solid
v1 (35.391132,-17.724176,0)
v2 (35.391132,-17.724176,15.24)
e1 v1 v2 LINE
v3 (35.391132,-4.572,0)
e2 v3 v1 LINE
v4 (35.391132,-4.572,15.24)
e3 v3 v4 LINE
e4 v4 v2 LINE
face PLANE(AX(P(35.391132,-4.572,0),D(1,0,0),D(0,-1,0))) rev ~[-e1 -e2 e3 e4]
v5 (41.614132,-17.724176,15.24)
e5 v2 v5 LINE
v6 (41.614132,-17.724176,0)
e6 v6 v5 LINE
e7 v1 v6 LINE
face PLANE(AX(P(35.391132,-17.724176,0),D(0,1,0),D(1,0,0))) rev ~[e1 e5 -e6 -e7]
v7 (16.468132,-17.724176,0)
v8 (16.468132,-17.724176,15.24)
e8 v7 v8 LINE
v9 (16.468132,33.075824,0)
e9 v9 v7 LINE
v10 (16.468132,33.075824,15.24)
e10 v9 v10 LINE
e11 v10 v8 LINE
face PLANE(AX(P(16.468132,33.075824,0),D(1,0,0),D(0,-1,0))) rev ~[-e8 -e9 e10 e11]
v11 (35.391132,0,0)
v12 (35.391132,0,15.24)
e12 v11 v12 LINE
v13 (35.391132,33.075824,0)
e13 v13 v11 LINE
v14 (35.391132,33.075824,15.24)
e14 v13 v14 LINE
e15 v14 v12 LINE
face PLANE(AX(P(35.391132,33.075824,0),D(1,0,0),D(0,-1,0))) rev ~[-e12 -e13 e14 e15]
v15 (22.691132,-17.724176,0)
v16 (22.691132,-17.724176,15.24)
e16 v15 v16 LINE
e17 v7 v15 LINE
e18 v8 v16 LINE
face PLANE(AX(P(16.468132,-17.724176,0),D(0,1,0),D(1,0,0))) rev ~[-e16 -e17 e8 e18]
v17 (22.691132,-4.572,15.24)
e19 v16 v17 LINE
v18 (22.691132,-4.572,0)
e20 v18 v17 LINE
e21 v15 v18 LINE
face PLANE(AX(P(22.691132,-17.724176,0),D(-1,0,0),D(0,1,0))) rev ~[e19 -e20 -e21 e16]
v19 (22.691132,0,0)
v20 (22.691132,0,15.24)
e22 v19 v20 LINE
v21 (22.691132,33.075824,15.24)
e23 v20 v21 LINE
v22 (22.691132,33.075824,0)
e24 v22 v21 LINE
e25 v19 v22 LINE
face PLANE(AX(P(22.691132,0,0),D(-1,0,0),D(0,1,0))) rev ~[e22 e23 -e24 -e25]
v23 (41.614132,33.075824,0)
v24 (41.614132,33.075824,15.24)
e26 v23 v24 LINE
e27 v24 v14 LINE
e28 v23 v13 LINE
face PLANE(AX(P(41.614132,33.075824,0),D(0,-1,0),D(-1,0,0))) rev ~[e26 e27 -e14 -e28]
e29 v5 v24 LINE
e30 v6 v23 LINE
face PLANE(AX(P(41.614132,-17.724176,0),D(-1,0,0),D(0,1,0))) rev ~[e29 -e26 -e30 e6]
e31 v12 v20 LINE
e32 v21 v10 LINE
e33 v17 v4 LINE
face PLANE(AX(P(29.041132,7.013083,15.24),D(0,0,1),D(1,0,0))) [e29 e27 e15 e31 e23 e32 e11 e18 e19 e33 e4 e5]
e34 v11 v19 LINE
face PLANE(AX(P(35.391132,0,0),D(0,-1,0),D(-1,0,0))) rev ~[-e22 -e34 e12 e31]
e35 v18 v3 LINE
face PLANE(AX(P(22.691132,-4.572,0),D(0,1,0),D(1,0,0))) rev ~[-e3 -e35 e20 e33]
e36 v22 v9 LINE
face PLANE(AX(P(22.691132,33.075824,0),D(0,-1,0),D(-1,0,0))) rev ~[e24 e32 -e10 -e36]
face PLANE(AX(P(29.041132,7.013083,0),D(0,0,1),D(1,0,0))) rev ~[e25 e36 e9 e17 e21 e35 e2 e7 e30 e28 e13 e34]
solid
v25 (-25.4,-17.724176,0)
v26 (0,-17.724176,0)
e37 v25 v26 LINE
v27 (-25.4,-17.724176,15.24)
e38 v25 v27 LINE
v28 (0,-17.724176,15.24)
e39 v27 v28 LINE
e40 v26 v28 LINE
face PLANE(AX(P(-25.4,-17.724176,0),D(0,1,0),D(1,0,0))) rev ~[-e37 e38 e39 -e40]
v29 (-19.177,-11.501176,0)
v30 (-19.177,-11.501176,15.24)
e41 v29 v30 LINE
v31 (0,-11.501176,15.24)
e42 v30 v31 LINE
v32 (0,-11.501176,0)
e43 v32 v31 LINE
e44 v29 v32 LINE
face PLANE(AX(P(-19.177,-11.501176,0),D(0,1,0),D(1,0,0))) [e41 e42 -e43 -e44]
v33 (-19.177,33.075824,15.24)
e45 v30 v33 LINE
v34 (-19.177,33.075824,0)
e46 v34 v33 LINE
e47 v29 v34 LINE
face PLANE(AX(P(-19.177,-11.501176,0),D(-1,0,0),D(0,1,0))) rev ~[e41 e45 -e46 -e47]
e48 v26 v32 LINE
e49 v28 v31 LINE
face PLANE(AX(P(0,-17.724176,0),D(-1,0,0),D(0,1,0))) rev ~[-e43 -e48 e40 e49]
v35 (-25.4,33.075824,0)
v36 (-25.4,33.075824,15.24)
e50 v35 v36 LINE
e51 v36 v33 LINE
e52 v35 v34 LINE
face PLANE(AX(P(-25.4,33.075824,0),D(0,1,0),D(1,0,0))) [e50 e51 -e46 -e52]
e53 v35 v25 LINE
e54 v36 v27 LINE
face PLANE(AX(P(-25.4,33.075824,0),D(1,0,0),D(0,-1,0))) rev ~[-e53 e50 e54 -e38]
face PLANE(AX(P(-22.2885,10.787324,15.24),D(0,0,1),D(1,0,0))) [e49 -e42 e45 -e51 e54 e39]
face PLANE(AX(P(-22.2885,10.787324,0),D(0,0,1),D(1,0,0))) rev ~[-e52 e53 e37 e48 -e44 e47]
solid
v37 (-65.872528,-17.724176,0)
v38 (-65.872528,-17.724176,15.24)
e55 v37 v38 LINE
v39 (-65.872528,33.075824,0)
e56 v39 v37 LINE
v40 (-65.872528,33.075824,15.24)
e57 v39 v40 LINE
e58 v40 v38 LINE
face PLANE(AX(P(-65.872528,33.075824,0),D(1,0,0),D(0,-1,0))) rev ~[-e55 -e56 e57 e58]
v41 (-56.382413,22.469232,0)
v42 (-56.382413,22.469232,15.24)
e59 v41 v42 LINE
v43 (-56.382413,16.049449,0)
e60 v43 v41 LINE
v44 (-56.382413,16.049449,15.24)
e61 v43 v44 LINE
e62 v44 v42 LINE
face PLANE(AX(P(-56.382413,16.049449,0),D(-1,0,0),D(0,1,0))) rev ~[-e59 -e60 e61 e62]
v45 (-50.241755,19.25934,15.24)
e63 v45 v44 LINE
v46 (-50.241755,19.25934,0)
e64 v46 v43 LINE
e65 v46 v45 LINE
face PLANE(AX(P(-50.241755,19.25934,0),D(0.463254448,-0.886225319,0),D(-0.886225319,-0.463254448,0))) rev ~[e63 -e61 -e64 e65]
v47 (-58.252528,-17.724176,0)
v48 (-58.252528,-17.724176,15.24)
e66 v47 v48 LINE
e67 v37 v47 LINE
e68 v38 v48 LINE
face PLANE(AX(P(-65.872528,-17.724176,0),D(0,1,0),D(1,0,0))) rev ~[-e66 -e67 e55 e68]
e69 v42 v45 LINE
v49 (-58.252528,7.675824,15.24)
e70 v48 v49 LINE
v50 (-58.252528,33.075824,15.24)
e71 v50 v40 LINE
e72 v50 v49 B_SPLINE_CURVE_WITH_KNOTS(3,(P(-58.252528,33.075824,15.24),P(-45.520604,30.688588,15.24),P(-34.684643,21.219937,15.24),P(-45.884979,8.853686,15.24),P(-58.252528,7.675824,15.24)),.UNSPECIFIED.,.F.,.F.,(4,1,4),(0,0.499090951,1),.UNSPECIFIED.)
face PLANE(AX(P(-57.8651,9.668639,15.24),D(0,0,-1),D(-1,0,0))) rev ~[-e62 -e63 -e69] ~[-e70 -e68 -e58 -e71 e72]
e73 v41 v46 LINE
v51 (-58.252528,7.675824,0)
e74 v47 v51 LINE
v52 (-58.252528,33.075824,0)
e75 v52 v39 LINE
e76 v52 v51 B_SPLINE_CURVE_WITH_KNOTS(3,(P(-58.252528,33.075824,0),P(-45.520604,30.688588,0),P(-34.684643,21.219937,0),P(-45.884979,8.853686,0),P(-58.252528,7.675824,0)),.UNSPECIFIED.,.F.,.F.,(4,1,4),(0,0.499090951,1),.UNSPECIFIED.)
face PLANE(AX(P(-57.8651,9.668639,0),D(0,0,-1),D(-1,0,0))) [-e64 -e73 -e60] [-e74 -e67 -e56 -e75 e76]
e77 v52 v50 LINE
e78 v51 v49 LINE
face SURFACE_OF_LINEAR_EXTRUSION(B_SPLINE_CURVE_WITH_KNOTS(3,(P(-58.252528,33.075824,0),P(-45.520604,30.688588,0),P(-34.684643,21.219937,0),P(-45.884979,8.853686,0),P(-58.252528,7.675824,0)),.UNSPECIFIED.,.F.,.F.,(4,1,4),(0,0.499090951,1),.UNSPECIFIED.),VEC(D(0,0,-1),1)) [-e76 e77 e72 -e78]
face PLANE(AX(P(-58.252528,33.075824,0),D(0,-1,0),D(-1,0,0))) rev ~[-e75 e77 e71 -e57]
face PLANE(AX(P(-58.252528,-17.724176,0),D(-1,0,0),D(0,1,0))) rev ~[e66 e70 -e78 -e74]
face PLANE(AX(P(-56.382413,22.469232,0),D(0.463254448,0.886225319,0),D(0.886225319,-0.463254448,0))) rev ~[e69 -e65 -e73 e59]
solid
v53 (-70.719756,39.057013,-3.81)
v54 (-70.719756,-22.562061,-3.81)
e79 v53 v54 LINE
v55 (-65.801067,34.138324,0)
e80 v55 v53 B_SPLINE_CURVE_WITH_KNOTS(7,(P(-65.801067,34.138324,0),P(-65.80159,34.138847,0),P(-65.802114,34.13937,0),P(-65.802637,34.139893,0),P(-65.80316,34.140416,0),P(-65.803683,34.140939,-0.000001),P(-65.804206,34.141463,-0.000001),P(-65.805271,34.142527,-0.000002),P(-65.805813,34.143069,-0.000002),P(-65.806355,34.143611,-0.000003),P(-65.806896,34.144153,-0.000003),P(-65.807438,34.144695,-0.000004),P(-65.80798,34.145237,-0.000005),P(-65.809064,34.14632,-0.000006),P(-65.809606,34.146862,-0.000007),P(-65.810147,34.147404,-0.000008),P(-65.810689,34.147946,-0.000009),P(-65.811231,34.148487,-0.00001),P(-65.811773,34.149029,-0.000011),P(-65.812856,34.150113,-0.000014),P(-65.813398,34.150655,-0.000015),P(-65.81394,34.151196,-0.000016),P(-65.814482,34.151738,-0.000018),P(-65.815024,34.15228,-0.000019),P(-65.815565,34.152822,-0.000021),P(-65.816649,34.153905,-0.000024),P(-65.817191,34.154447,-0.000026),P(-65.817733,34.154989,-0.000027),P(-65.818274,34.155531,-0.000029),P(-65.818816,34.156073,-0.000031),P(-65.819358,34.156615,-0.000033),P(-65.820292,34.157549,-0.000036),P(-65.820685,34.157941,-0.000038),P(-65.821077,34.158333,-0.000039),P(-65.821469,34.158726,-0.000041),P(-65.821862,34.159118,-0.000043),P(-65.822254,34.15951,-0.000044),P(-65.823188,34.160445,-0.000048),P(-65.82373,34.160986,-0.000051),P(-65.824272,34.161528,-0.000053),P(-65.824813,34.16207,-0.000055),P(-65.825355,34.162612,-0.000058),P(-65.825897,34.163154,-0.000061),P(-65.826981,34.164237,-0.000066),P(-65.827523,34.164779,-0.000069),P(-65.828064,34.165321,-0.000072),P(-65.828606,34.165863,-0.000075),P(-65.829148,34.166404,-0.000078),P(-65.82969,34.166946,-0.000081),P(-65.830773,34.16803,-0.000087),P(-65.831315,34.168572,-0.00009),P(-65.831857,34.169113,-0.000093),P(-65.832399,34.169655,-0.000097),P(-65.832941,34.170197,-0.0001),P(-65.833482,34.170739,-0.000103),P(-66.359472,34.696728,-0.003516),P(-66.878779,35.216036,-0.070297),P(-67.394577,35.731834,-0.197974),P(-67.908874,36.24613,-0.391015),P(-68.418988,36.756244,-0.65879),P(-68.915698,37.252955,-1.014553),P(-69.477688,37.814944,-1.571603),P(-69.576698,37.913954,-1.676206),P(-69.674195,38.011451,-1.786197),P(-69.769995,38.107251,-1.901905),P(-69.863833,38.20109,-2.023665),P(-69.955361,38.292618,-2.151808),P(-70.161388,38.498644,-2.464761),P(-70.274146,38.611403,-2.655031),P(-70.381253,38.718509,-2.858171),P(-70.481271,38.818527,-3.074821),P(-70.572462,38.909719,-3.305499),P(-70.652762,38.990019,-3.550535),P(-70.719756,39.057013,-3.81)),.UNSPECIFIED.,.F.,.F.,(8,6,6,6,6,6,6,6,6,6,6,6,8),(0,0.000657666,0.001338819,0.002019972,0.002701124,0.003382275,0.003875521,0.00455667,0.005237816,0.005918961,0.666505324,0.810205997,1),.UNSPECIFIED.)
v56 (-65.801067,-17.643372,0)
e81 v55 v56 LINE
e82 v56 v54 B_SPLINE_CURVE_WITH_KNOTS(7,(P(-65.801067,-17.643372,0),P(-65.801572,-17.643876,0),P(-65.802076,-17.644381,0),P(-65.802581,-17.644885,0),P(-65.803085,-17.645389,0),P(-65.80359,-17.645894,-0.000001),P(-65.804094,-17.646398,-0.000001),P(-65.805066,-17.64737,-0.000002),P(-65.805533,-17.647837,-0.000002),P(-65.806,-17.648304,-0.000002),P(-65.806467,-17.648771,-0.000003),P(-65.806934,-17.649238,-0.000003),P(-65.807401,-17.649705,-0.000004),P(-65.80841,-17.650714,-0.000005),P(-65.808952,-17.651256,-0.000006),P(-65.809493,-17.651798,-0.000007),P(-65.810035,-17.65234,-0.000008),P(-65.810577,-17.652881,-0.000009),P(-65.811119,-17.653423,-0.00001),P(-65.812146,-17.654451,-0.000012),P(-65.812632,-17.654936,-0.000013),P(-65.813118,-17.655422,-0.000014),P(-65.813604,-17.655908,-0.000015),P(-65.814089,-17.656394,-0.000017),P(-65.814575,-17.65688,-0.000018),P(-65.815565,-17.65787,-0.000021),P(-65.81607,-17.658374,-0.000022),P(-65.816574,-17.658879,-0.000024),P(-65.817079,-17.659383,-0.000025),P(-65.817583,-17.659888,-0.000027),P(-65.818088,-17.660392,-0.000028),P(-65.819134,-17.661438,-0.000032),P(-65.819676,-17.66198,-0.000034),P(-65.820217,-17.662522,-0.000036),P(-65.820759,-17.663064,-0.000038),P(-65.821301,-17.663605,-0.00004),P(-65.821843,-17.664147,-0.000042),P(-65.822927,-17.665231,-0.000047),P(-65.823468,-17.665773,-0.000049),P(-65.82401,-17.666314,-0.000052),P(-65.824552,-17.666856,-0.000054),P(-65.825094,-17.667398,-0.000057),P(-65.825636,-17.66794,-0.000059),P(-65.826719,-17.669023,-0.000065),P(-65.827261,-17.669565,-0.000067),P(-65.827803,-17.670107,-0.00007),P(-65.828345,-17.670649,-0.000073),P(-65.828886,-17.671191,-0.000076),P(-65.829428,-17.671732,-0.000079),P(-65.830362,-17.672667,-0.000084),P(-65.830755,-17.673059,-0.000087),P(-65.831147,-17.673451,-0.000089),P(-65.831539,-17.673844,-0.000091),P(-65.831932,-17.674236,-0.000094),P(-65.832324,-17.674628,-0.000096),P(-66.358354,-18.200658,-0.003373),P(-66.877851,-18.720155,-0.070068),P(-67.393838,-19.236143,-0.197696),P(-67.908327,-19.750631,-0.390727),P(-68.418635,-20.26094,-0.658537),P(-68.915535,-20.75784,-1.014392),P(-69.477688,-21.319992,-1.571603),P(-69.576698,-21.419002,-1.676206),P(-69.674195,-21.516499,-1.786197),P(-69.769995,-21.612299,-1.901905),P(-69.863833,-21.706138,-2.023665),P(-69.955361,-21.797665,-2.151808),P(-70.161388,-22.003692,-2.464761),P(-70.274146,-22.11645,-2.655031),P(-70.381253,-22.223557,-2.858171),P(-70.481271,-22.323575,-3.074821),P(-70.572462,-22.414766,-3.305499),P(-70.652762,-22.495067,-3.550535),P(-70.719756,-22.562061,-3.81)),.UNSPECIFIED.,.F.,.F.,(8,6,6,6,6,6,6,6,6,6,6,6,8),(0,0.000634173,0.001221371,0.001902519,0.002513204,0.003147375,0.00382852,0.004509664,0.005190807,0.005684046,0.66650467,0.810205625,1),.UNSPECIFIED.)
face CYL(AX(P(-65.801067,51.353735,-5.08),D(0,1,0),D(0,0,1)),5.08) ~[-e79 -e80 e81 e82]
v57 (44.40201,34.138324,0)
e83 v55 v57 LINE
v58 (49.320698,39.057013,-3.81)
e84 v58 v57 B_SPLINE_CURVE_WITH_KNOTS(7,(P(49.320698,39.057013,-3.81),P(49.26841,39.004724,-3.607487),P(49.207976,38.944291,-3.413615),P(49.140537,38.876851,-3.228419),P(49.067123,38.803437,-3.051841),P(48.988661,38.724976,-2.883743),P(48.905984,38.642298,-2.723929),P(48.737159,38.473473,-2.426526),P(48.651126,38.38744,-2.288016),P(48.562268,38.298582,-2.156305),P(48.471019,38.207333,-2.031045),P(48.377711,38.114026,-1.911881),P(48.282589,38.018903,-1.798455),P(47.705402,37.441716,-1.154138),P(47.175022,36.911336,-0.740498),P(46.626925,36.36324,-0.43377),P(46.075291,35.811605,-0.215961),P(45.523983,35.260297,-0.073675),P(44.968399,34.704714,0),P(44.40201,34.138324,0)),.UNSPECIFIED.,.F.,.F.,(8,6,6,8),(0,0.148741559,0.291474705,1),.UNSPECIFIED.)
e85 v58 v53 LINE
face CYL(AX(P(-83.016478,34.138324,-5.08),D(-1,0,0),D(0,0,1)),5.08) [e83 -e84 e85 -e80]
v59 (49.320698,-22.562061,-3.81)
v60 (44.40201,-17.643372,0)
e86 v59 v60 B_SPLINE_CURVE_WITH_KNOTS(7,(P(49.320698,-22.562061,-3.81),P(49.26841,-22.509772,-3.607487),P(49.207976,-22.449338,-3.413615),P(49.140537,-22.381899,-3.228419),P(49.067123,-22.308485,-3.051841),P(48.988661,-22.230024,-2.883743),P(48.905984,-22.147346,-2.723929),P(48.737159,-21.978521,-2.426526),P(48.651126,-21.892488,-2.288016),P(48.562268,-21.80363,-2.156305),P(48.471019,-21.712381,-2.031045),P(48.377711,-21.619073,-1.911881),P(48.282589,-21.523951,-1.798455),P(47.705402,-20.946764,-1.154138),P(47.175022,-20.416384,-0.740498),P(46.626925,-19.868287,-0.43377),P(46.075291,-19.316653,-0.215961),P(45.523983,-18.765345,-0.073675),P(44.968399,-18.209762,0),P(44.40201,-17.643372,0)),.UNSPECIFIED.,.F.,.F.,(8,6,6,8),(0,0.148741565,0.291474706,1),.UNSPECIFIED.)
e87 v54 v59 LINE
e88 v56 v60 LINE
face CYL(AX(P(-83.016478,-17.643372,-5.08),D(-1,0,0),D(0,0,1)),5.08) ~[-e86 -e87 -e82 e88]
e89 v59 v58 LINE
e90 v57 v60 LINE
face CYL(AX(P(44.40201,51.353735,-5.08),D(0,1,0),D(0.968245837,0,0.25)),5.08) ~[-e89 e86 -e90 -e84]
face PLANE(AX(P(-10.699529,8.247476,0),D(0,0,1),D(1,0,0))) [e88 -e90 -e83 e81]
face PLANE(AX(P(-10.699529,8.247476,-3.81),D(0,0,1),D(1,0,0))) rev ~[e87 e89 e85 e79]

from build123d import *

# Parameters (mm, degrees)
F1_DEPTH    = 15.24
F2_DEPTH    = 15.24
F0_W        = 6.223
F0_H        = 44.577
F0_H_2      = 6.223
F0_W_2      = 19.177
F4_DEPTH    = 3.81
F5_T1_DEPTH = 144.6338988167
F5_T3_DEPTH = 86.212517401


# Not quite as in the source:
# - a fillet or chamfer that OpenCascade refuses, or shapes differently, is made with other operations: its cross-section is extruded or revolved along the edge and cut away or added


with BuildPart() as f1:
    # F0 (on Top) → F1 (new body)
    with BuildSketch(Plane.XY):
        with BuildLine():
            add(Edge.make_bspline(
                [(-58.2525283742, 33.0758240239), (-45.5206043265, 30.688588265), (-34.6846427624, 21.2199367045), (-45.8849792124, 8.8536855352), (-58.2525283742, 7.6758240239)],
                knots=[0, 0, 0, 0, 0.4990909505, 1, 1, 1, 1], degree=3))
            Line((-58.2525283742, 33.0758240239), (-65.8725283742, 33.0758240239))
            Line((-65.8725283742, 33.0758240239), (-65.8725283742, -17.7241759761))
            Line((-65.8725283742, -17.7241759761), (-58.2525283742, -17.7241759761))
            Line((-58.2525283742, -17.7241759761), (-58.2525283742, 7.6758240239))
        make_face()
        Polygon((-56.3824130938, 16.0494490157), (-56.3824130938, 22.4692318326), (-50.2417553016, 19.2593404241), align=None, mode=Mode.SUBTRACT)
    extrude(amount=F1_DEPTH)

    # F0 (on Top) → F2 (join)
    with BuildSketch(Plane.XY):
        with BuildLine():
            add(Edge.make_bspline(
                [(-58.2525283742, 33.0758240239), (-45.5206043265, 30.688588265), (-34.6846427624, 21.2199367045), (-45.8849792124, 8.8536855352), (-58.2525283742, 7.6758240239)],
                knots=[0, 0, 0, 0, 0.4990909505, 1, 1, 1, 1], degree=3))
            Line((-58.2525283742, 33.0758240239), (-65.8725283742, 33.0758240239))
            Line((-65.8725283742, 33.0758240239), (-65.8725283742, -17.7241759761))
            Line((-65.8725283742, -17.7241759761), (-58.2525283742, -17.7241759761))
            Line((-58.2525283742, -17.7241759761), (-58.2525283742, 7.6758240239))
        make_face()
        Polygon((-56.3824130938, 16.0494490157), (-56.3824130938, 22.4692318326), (-50.2417553016, 19.2593404241), align=None, mode=Mode.SUBTRACT)
    extrude(amount=F2_DEPTH)


with BuildPart() as f2:
    # F0 (on Top) → F2, piece 2 (new body)
    with BuildSketch(Plane.XY):
        with Locations((-22.2885, 10.7873240239)):
            Rectangle(F0_W, F0_H)
        with Locations((-22.2885, -14.6126759761)):
            Rectangle(F0_W, F0_H_2)
        with Locations((-9.5885, -14.6126759761)):
            Rectangle(F0_W_2, F0_H_2)
    extrude(amount=F2_DEPTH)


with BuildPart() as f2b:
    # F0 (on Top) → F2, piece 3 (new body)
    with BuildSketch(Plane.XY):
        Polygon((22.6911320935, 33.0758240239), (16.4681320935, 33.0758240239), (16.4681320935, -17.7241759761), (22.6911320935, -17.7241759761), (22.6911320935, -4.572), (35.3911320935, -4.572), (35.3911320935, -17.7241759761), (41.6141320935, -17.7241759761), (41.6141320935, 33.0758240239), (35.3911320935, 33.0758240239), (35.3911320935, 0), (22.6911320935, 0), align=None)
    extrude(amount=F2_DEPTH)


with BuildPart() as f4:
    # F3 (on Top) → F4 (new body)
    with BuildSketch(Plane.XY):
        Polygon((49.3206983823, -17.523912622), (49.3206983823, 32.3124918177), (49.3206983823, 39.0570126474), (-70.719756186, 39.0570126474), (-70.719756186, -22.5620605052), (49.3206983823, -22.5620605052), align=None)
    extrude(amount=-F4_DEPTH)

    # F5: fillet of radius 5.08 on 4 edges, made by hand

    # F5_s2 → F5_t1 (cut)
    with BuildSketch(Plane.YZ.offset(-83.0164783102)):
        with BuildLine():
            ThreePointArc((-17.6433716555, 0), (-20.7542236288, -1.0639073716), (-22.5620605052, -3.81))
            Line((-22.5620605052, -3.81), (-22.5620605052, 0))
            Line((-22.5620605052, 0), (-17.6433716555, 0))
        make_face()
        with BuildLine():
            ThreePointArc((34.1383237977, 0), (37.249175771, -1.0639073716), (39.0570126474, -3.81))
            Line((39.0570126474, -3.81), (39.0570126474, 0))
            Line((39.0570126474, 0), (34.1383237977, 0))
        make_face()
    extrude(amount=F5_T1_DEPTH, mode=Mode.SUBTRACT)

    # F5_s4 → F5_t3 (cut)
    with BuildSketch(Plane.XZ.offset(-51.3537347716)):
        with BuildLine():
            ThreePointArc((-65.8010673363, 0), (-68.9119193097, -1.0639073716), (-70.719756186, -3.81))
            Line((-70.719756186, -3.81), (-70.719756186, 0))
            Line((-70.719756186, 0), (-65.8010673363, 0))
        make_face()
        with BuildLine():
            ThreePointArc((49.3206983823, -3.81), (47.512861506, -1.0639073716), (44.4020095326, 0))
            Line((44.4020095326, 0), (49.3206983823, 0))
            Line((49.3206983823, 0), (49.3206983823, -3.81))
        make_face()
    extrude(amount=F5_T3_DEPTH, mode=Mode.SUBTRACT)


solid = Compound([f1.part, f2.part, f2b.part, f4.part])
